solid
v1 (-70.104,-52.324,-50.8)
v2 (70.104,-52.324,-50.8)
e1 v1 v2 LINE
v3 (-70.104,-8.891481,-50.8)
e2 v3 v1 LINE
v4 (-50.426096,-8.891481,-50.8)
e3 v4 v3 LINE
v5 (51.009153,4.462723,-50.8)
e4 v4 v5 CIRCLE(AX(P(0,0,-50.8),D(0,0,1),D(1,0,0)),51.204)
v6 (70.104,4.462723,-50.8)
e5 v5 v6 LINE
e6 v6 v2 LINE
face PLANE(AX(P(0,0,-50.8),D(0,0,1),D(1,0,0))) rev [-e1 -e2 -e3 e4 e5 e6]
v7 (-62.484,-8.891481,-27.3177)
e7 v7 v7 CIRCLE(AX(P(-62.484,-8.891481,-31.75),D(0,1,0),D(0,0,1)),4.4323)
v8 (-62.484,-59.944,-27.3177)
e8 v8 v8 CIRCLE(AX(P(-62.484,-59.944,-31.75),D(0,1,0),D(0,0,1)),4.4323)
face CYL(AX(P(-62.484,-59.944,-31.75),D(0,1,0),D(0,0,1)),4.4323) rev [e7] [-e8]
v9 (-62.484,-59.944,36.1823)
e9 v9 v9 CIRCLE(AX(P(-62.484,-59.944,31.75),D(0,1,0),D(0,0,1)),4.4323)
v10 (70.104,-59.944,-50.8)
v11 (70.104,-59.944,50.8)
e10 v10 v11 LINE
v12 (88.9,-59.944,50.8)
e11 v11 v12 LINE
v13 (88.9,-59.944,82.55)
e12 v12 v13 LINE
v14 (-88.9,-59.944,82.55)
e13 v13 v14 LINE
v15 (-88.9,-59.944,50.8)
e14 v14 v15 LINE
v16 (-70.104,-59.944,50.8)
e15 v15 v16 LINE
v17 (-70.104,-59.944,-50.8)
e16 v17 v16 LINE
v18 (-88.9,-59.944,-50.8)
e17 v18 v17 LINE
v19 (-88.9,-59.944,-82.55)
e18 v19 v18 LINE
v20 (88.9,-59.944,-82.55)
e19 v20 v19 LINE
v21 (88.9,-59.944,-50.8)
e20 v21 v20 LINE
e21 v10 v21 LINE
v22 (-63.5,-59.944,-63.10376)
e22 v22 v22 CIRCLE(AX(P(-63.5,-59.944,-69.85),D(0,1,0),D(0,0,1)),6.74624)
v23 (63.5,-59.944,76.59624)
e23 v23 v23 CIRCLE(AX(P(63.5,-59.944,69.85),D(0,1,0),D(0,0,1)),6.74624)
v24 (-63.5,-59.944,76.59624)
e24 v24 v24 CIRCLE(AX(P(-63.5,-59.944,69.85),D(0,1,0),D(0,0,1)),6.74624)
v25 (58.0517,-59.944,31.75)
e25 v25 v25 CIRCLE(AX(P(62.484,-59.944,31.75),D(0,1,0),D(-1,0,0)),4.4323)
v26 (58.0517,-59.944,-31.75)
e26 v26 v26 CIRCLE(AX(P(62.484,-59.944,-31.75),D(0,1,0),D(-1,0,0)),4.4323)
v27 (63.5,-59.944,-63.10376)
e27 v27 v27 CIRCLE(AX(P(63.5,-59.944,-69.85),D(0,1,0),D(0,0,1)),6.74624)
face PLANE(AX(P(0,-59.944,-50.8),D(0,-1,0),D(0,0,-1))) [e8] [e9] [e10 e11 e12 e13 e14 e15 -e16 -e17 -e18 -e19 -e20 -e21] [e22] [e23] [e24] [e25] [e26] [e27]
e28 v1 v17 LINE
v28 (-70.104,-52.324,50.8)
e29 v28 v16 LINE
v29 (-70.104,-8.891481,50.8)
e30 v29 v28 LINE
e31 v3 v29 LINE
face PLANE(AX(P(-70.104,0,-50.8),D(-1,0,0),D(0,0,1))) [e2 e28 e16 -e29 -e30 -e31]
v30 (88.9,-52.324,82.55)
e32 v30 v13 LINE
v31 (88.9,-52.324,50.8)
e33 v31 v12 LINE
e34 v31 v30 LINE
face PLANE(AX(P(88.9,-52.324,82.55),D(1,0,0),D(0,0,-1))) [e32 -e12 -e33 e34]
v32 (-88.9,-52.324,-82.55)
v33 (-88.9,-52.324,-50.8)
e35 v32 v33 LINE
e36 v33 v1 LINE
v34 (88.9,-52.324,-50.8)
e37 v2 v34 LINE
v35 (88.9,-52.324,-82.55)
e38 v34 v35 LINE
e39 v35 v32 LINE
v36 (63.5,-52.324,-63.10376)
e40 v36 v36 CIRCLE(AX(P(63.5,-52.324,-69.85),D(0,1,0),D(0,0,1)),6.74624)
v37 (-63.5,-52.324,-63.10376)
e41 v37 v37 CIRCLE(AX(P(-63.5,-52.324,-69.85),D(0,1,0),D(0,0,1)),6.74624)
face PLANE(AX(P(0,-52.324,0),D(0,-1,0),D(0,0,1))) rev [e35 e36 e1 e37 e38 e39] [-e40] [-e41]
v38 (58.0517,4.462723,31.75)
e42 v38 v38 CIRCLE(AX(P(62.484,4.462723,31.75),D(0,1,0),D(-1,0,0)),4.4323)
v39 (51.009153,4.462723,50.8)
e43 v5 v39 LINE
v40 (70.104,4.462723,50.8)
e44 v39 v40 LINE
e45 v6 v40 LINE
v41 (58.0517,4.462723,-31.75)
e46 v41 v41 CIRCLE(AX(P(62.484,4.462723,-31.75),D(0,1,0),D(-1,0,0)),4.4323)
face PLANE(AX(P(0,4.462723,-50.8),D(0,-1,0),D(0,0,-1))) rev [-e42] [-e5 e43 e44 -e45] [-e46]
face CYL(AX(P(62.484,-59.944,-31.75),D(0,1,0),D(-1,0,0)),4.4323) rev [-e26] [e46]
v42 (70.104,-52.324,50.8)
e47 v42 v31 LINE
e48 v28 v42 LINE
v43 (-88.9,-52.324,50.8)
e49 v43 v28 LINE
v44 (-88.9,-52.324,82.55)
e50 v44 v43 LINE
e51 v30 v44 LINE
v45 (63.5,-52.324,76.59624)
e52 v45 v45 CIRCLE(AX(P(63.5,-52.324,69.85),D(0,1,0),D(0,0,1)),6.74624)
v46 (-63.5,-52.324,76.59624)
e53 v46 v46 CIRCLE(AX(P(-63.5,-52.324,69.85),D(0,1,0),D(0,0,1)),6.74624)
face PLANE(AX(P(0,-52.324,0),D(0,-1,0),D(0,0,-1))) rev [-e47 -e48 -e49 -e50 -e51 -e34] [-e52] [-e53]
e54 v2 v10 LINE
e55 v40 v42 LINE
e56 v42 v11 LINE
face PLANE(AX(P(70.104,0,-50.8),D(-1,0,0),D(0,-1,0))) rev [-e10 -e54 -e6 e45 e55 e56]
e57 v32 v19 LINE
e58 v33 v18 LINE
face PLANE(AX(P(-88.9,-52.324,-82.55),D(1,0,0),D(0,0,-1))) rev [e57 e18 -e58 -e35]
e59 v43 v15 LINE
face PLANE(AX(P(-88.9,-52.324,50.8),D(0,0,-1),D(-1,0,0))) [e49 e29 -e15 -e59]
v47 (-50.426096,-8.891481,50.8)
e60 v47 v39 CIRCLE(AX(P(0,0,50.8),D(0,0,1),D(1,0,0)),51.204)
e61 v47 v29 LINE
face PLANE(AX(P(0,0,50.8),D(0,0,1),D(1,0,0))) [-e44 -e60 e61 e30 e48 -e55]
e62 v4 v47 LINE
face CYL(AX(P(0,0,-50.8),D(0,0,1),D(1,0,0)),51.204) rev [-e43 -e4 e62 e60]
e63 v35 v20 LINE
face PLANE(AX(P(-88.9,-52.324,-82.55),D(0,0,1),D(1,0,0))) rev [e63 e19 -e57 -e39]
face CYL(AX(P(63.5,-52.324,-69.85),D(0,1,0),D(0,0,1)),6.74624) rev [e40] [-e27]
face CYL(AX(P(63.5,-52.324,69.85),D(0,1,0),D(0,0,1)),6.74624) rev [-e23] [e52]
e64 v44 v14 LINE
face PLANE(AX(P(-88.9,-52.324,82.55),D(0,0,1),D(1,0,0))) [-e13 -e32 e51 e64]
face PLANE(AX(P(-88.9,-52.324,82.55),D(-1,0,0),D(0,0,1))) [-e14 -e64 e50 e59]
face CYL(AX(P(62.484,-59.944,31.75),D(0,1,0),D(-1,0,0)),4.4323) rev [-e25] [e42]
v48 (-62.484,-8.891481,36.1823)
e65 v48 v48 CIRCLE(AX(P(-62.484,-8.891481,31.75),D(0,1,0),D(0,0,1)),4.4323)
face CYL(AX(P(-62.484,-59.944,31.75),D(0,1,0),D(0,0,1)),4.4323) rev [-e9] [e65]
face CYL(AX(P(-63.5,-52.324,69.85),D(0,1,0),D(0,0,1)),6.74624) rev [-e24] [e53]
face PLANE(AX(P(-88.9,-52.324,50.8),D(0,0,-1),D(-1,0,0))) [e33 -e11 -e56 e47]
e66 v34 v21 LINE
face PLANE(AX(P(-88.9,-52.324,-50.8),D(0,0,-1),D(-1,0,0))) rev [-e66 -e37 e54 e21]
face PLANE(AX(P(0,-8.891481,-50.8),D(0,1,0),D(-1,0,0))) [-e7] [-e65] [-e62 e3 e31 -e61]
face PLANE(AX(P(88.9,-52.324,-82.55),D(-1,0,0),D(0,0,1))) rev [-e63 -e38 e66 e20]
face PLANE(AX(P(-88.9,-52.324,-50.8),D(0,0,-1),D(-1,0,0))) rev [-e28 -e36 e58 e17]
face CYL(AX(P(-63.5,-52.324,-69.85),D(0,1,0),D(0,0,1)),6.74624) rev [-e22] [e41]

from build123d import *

# Parameters (mm, degrees)
SKETCH1_W                       = 10.823103443
SKETCH1_H                       = 51.052518719
BOSS_EXTRUDE1_DEPTH             = 50.8
SKETCH2_W                       = 177.8
SKETCH2_H                       = 31.75
BOSS_EXTRUDE2_DEPTH             = 7.62
F_1_2_START                     = -59.944
F_1_2_CLEARANCE_HOLE1_OUTLINE_R = 6.74624
F_1_2_CLEARANCE_HOLE1_DEPTH     = 7.62
SKETCH8_R                       = 4.4323
CUT_EXTRUDE2_DEPTH              = 138.353334223
SKETCH9_R                       = 4.4323
CUT_EXTRUDE3_DEPTH              = 132.62094122


# Read off the part's stored shape, not the designer's step: 1/2 Clearance Hole1
with BuildPart() as part:
    # Sketch1 → Boss-Extrude1 (new, symmetric)
    with BuildSketch(Plane.XY):
        with Locations((-64.692448278, -34.41774064)):
            Rectangle(SKETCH1_W, SKETCH1_H)
        with BuildLine():
            ThreePointArc((-2e-09, -59.944), (-39.117081832, -45.421768404), (-59.280896557, -8.891481281))
            Line((-59.280896557, -8.891481281), (-59.280896557, -59.944))
            Line((-59.280896557, -59.944), (-2e-09, -59.944))
        make_face()
        with BuildLine():
            Line((-50.42609614, -8.891481281), (-59.280896557, -8.891481281))
            ThreePointArc((-59.280896557, -8.891481281), (-39.117081832, -45.421768404), (-2e-09, -59.944))
            ThreePointArc((-2e-09, -59.944), (42.386808891, -42.386808892), (59.944, 0))
            ThreePointArc((59.944, 0), (59.902397652, 2.232911009), (59.777648353, 4.462722648))
            Line((59.777648353, 4.462722648), (51.009153275, 4.462722648))
            ThreePointArc((51.009153275, 4.462722648), (51.155265092, 2.233487109), (51.203999954, 0))
            ThreePointArc((51.203999954, 0), (4.462722648, -51.009153275), (-50.42609614, -8.891481281))
        make_face()
        with BuildLine():
            ThreePointArc((59.944, 0), (42.386808891, -42.386808892), (-2e-09, -59.944))
            Line((-2e-09, -59.944), (59.944, -59.944))
            Line((59.944, -59.944), (59.944, 0))
        make_face()
        with BuildLine():
            Line((70.104, 4.462722648), (59.777648353, 4.462722648))
            ThreePointArc((59.777648353, 4.462722648), (59.902397652, 2.232911009), (59.944, 0))
            Line((59.944, 0), (59.944, -59.944))
            Line((59.944, -59.944), (70.104, -59.944))
            Line((70.104, -59.944), (70.104, 4.462722648))
        make_face()
    extrude(amount=BOSS_EXTRUDE1_DEPTH, both=True)

    # Sketch2 → Boss-Extrude2 (add)
    with BuildSketch(Plane.XZ.offset(59.944)):
        with Locations((0, 66.675)):
            Rectangle(SKETCH2_W, SKETCH2_H)
    boss_extrude2 = extrude(amount=-BOSS_EXTRUDE2_DEPTH)

    # 1/2 Clearance Hole1 outline → 1/2 Clearance Hole1 (cut)
    with BuildSketch(Plane(origin=(0, 0, 0), x_dir=(1, 0, 0), z_dir=(0, 1, 0)).offset(F_1_2_START)):
        with Locations((63.5, -69.85)):
            Circle(F_1_2_CLEARANCE_HOLE1_OUTLINE_R)
        with Locations((-63.5, -69.85)):
            Circle(F_1_2_CLEARANCE_HOLE1_OUTLINE_R)
    f_1_2_clearance_hole1 = extrude(amount=F_1_2_CLEARANCE_HOLE1_DEPTH, mode=Mode.SUBTRACT)

    # Mirror1: Boss-Extrude2, 1/2 Clearance Hole1 across plane
    add(boss_extrude2.mirror(Plane.XY))
    add(f_1_2_clearance_hole1.mirror(Plane.XY), mode=Mode.SUBTRACT)

    # Sketch8 → Cut-Extrude2 (cut, through all)
    with BuildSketch(Plane(origin=(0, 4.462722648, 0), x_dir=(1, 0, 0), z_dir=(0, 1, 0))):
        with Locations(Location((62.484, 31.75, 0), (0, 0, 180))):
            Circle(SKETCH8_R)
        with Locations(Location((62.484, -31.75, 0), (0, 0, 180))):
            Circle(SKETCH8_R)
    extrude(amount=-CUT_EXTRUDE2_DEPTH, mode=Mode.SUBTRACT)

    # Sketch9 → Cut-Extrude3 (cut, through all)
    with BuildSketch(Plane(origin=(0, -8.891481281, 0), x_dir=(1, 0, 0), z_dir=(0, 1, 0))):
        with Locations(Location((-62.484, 31.75, 0), (0, 0, 270))):
            Circle(SKETCH9_R)
        with Locations(Location((-62.484, -31.75, 0), (0, 0, 270))):
            Circle(SKETCH9_R)
    extrude(amount=-CUT_EXTRUDE3_DEPTH, mode=Mode.SUBTRACT)


solid = part.part
